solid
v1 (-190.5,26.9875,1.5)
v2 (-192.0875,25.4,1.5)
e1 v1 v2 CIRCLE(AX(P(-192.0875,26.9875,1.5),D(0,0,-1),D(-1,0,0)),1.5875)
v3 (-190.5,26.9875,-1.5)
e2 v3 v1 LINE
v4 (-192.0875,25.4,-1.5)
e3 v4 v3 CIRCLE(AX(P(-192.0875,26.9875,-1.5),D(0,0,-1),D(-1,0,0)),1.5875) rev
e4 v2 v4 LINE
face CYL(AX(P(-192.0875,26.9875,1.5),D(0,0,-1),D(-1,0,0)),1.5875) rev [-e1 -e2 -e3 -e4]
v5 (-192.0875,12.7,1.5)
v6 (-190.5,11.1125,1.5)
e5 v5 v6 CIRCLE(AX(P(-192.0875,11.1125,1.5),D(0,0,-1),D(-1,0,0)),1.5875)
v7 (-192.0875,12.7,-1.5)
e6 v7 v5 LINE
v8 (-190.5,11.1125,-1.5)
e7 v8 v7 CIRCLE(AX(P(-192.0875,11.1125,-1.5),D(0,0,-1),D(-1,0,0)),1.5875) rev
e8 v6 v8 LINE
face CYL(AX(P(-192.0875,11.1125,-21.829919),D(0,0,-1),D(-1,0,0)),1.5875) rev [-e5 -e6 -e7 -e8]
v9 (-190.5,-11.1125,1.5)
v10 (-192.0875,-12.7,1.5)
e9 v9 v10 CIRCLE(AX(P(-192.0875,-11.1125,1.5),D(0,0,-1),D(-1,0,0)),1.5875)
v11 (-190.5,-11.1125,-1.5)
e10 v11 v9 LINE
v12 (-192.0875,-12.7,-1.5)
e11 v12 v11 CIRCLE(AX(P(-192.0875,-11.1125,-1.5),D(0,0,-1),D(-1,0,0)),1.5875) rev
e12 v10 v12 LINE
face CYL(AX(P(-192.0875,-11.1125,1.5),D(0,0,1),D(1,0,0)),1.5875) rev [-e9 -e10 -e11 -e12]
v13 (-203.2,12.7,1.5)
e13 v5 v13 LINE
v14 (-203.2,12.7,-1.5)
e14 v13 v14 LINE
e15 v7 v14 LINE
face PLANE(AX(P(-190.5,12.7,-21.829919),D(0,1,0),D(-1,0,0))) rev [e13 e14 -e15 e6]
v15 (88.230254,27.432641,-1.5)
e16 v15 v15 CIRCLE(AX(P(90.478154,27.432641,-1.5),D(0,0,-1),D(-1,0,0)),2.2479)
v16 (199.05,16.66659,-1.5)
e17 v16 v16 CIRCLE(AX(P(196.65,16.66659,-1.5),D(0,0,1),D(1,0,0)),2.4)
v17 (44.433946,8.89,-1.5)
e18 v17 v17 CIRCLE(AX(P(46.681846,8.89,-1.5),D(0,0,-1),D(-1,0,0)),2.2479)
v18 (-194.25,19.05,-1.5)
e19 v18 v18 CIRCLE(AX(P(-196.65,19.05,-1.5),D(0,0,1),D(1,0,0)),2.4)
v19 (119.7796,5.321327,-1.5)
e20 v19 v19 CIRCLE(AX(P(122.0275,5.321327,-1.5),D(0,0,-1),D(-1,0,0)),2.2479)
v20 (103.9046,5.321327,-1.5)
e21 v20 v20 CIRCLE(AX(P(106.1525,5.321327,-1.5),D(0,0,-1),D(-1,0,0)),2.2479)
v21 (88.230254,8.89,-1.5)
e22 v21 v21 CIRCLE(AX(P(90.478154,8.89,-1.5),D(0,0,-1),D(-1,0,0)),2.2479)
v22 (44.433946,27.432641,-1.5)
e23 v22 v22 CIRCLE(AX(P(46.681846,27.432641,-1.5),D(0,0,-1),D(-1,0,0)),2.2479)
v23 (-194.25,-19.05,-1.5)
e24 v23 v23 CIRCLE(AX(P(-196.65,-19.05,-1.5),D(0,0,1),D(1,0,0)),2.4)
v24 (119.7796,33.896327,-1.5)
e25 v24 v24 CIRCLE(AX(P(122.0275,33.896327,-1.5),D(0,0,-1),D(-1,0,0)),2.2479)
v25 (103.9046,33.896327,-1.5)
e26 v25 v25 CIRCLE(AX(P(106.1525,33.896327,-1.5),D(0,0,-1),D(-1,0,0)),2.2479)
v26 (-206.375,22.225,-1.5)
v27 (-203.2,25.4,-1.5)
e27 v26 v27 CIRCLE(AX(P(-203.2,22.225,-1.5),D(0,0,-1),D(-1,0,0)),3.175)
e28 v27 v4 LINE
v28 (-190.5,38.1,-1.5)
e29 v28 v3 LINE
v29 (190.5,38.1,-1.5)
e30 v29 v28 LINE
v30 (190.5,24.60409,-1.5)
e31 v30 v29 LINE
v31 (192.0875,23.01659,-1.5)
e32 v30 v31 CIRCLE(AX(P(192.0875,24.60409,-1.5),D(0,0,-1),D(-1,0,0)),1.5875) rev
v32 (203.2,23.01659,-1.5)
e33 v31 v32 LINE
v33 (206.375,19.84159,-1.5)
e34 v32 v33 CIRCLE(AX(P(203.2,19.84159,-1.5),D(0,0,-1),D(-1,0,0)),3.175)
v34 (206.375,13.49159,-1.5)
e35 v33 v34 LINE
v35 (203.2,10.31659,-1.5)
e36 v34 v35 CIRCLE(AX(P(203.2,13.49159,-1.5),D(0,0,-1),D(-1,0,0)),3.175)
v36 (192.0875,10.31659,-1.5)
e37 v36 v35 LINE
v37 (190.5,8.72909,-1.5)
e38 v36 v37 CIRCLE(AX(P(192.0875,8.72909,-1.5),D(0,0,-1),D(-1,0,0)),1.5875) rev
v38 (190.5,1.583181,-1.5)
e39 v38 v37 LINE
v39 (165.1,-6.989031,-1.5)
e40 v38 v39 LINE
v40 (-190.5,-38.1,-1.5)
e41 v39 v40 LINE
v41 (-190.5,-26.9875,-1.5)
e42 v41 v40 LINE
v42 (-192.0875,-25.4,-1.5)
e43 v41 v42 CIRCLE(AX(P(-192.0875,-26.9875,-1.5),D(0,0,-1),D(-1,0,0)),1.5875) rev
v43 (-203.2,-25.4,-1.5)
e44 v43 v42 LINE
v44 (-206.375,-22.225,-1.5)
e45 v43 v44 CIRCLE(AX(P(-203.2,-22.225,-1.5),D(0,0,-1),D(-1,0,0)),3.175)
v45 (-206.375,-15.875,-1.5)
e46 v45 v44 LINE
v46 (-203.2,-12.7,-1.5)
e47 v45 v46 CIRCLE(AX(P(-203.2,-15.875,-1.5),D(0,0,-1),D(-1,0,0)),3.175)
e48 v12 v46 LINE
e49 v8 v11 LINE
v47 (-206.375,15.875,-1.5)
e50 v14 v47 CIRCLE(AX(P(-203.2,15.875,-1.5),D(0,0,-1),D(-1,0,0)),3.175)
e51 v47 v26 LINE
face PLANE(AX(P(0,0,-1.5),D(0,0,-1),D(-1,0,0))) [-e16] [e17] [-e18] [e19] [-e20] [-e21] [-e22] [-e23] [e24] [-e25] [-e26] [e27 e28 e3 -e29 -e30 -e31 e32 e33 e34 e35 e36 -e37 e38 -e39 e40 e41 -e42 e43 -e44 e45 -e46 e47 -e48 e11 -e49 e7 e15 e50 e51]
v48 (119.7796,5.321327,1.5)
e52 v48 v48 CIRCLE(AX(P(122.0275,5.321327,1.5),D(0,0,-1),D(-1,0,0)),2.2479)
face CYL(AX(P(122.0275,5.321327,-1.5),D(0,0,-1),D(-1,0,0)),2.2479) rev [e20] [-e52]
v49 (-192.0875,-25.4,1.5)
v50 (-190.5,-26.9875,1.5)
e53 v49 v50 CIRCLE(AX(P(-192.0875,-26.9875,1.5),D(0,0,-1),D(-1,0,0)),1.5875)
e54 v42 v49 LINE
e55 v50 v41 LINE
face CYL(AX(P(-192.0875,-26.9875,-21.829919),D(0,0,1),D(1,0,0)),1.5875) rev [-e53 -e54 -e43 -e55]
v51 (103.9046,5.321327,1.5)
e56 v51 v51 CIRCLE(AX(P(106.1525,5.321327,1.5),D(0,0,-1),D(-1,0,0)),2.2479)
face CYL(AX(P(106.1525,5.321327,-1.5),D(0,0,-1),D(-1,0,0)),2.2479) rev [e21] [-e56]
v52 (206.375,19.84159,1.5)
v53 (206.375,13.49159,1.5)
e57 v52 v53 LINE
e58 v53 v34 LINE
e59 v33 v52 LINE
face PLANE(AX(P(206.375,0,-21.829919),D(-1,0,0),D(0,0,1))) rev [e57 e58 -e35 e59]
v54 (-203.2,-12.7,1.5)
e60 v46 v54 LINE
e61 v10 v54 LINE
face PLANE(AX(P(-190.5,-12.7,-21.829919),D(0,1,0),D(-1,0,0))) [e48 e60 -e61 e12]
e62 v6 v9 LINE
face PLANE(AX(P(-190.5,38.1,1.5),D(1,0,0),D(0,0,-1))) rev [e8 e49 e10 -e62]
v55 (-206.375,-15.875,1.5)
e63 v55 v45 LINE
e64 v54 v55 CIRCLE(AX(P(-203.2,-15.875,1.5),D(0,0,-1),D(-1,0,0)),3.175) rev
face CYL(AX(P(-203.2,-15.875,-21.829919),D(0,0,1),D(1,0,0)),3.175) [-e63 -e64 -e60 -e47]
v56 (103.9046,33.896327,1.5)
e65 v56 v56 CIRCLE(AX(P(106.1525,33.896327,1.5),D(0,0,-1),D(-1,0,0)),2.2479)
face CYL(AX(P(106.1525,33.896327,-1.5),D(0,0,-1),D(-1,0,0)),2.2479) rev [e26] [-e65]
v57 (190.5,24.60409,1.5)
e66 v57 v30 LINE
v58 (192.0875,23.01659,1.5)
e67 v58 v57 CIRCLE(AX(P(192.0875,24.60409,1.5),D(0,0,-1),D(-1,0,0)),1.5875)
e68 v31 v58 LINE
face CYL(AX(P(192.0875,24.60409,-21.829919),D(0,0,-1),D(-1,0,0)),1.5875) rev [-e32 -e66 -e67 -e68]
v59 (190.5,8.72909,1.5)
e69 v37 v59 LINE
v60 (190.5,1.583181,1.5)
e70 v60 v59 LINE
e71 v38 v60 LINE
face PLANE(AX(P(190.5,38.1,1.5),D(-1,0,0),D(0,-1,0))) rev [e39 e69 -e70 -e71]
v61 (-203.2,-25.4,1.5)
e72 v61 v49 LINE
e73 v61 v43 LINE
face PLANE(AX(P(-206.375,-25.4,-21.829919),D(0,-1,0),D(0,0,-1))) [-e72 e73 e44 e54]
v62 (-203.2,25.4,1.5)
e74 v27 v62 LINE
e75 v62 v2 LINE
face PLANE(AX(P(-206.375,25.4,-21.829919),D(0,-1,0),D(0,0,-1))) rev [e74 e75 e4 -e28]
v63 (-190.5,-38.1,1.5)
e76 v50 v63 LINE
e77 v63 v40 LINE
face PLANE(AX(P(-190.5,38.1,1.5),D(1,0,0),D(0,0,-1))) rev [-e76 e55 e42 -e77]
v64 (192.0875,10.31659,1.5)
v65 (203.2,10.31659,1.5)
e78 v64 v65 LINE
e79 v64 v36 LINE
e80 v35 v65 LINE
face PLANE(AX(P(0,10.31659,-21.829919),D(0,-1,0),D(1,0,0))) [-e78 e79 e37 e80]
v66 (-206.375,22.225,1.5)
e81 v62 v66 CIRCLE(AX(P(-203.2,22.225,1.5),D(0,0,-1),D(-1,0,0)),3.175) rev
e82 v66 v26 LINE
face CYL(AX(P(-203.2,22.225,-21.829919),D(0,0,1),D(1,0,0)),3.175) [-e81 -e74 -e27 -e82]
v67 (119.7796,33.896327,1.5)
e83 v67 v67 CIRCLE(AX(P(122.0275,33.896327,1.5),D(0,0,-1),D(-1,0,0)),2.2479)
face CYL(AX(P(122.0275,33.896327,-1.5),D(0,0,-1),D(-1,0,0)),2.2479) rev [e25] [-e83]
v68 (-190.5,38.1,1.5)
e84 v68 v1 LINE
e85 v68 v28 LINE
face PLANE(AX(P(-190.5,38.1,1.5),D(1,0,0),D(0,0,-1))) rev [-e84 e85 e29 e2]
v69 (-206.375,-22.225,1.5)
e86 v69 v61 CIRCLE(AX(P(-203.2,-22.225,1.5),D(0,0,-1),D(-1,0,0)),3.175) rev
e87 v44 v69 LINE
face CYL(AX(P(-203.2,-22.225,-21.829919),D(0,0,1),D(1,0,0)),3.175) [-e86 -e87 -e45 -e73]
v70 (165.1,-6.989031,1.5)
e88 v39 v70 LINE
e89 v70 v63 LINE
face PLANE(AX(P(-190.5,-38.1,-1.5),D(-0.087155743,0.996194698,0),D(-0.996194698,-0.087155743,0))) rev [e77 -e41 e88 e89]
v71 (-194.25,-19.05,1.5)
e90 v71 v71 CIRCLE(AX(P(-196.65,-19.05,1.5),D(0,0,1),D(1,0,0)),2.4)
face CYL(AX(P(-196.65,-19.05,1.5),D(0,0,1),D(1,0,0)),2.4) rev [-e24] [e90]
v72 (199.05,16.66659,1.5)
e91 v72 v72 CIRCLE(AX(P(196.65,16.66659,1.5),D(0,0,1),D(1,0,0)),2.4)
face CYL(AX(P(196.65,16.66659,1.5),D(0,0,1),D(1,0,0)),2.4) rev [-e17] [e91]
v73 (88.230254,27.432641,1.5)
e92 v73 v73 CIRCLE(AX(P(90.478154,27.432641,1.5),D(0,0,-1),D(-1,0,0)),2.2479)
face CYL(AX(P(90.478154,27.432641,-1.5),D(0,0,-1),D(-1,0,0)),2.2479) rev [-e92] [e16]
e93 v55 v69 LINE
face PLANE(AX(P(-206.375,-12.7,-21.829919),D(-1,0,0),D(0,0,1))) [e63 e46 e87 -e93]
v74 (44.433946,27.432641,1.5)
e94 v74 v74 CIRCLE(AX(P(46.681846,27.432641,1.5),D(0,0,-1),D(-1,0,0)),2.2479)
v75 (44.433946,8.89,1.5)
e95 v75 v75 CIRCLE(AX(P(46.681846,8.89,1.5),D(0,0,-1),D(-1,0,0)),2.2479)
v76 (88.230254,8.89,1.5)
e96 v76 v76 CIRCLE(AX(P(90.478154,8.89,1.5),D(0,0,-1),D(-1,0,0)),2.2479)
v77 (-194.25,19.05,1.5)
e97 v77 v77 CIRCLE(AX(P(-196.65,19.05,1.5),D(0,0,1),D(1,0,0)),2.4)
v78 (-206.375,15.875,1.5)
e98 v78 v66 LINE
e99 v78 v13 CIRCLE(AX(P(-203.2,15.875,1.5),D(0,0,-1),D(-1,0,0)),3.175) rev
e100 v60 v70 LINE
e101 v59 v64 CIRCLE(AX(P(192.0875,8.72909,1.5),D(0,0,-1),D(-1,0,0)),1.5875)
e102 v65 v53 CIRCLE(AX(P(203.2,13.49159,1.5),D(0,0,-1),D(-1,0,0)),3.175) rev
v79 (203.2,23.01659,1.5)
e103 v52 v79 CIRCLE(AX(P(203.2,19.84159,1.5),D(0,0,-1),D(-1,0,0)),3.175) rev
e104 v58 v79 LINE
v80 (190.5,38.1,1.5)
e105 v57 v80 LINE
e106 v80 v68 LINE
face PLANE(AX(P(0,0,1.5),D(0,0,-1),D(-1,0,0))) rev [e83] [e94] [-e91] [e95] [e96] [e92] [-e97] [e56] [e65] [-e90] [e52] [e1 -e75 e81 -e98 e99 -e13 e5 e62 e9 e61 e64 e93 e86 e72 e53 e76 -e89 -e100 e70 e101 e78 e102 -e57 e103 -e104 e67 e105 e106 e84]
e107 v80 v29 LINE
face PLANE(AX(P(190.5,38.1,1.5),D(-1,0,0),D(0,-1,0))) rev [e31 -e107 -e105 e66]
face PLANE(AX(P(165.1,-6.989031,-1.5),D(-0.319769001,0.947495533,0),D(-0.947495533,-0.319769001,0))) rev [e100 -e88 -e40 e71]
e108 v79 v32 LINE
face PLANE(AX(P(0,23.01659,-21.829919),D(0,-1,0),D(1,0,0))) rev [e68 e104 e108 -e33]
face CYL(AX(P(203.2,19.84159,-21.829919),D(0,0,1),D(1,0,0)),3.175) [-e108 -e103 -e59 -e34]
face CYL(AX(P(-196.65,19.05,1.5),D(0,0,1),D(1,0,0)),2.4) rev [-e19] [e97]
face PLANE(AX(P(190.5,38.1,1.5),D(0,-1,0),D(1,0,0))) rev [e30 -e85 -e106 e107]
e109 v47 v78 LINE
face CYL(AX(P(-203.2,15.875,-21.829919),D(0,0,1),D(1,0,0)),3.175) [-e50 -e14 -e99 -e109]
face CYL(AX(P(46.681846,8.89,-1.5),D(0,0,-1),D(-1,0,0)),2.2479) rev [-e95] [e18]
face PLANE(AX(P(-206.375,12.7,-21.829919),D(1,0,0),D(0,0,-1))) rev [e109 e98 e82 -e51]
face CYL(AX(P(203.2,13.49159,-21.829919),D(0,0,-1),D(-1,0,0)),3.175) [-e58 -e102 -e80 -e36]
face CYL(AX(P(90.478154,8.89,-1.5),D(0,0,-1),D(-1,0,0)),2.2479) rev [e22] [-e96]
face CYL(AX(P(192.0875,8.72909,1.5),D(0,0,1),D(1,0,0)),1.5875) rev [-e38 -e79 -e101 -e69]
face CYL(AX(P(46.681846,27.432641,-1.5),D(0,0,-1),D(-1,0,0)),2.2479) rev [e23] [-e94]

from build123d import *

# Parameters (mm, degrees)
SKETCH1_W                  = 381
SKETCH1_H                  = 76.2
BOSS_EXTRUDE1_DEPTH        = 1.5
CUT_EXTRUDE1_DEPTH         = 195.29580541
SKETCH3_W                  = 15.875
SKETCH3_H                  = 12.7
BOSS_EXTRUDE2_DEPTH        = 3
FILLET1_R                  = 3.175
MIRROR1_START              = -1.5
MIRROR1_DEPTH              = 3
FILLET3_R                  = 1.5875
FILLET4_R                  = 3.175
F_8_CLEARANCE_HOLE1_D      = 4.4958
F_4_8_4_8_DIAMETER_HOLE1_D = 4.8
CUT_EXTRUDE2_DEPTH         = 210.883897965


# Read off the part's stored shape, not the designer's step: Mirror1
with BuildPart() as part:
    # Sketch1 → Boss-Extrude1 (new, symmetric)
    with BuildSketch(Plane.XY):
        Rectangle(SKETCH1_W, SKETCH1_H)
    extrude(amount=BOSS_EXTRUDE1_DEPTH, both=True)

    # Sketch5 → Cut-Extrude1 (cut, through all)
    with BuildSketch(Plane.XY.offset(1.5)):
        Polygon((-190.5, -38.1), (190.5, -4.766819197), (190.5, -38.1), align=None)
    extrude(amount=-CUT_EXTRUDE1_DEPTH, mode=Mode.SUBTRACT)

    # Sketch3 → Boss-Extrude2 (add)
    with BuildSketch(Plane.XY.offset(1.5)):
        with Locations((-198.4375, -19.05)):
            Rectangle(SKETCH3_W, SKETCH3_H)
        with Locations((198.4375, 16.666590402)):
            Rectangle(SKETCH3_W, SKETCH3_H)
    extrude(amount=-BOSS_EXTRUDE2_DEPTH)

    # Fillet1
    fillet1_edges = [part.edges().sort_by_distance(p)[0] for p in [
        (-206.375, -12.7, 0),
        (-206.375, -25.4, 0),
    ]]
    fillet(fillet1_edges, radius=FILLET1_R)

    # Mirror1 outline → Mirror1 (add)
    with BuildSketch(Plane.XY.offset(MIRROR1_START)):
        with BuildLine():
            Line((-206.375, 22.225), (-206.375, 15.875))
            ThreePointArc((-206.375, 15.875), (-205.44506403, 13.62993597), (-203.2, 12.7))
            Line((-203.2, 12.7), (-190.5, 12.7))
            Line((-190.5, 12.7), (-190.5, 25.4))
            Line((-190.5, 25.4), (-203.2, 25.4))
            ThreePointArc((-203.2, 25.4), (-205.44506403, 24.47006403), (-206.375, 22.225))
        make_face()
    extrude(amount=MIRROR1_DEPTH)

    # Fillet3
    fillet3_edges = [part.edges().sort_by_distance(p)[0] for p in [
        (190.5, 10.316590402, 0),
        (190.5, 23.016590402, 0),
        (-190.5, -25.4, 0),
        (-190.5, -12.7, 0),
        (-190.5, 25.4, 0),
        (-190.5, 12.7, 0),
    ]]
    fillet(fillet3_edges, radius=FILLET3_R)

    # Fillet4
    fillet4_edges = [part.edges().sort_by_distance(p)[0] for p in [
        (206.375, 23.016590402, 0),
        (206.375, 10.316590402, 0),
    ]]
    fillet(fillet4_edges, radius=FILLET4_R)

    # #8 Clearance Hole1 (through all)
    with Locations(Plane(origin=(0, 0, -1.5), x_dir=(-1, 0, 0), z_dir=(0, 0, -1))):
        with Locations((-46.681846327, 8.89), (-46.681846327, 27.432641431), (-90.478153673, 27.432641431), (-90.478153673, 8.89), (-106.1525, 33.896326852), (-122.0275, 33.896326852), (-122.0275, 5.321326852), (-106.1525, 5.321326852)):
            Hole(F_8_CLEARANCE_HOLE1_D / 2)

    # Ø4.8 (4.8) Diameter Hole1 (through all)
    with Locations(Plane.XY.offset(1.5)):
        with Locations((-196.65, 19.05), (-196.65, -19.05), (196.65, 16.666590402)):
            Hole(F_4_8_4_8_DIAMETER_HOLE1_D / 2)

    # Sketch12 → Cut-Extrude2 (cut, through all)
    with BuildSketch(Plane.XY.offset(1.5)):
        Polygon((190.5, -4.766819197), (165.1, -6.98903125), (190.5, 1.583180803), align=None)
    extrude(amount=-CUT_EXTRUDE2_DEPTH, mode=Mode.SUBTRACT)


solid = part.part
